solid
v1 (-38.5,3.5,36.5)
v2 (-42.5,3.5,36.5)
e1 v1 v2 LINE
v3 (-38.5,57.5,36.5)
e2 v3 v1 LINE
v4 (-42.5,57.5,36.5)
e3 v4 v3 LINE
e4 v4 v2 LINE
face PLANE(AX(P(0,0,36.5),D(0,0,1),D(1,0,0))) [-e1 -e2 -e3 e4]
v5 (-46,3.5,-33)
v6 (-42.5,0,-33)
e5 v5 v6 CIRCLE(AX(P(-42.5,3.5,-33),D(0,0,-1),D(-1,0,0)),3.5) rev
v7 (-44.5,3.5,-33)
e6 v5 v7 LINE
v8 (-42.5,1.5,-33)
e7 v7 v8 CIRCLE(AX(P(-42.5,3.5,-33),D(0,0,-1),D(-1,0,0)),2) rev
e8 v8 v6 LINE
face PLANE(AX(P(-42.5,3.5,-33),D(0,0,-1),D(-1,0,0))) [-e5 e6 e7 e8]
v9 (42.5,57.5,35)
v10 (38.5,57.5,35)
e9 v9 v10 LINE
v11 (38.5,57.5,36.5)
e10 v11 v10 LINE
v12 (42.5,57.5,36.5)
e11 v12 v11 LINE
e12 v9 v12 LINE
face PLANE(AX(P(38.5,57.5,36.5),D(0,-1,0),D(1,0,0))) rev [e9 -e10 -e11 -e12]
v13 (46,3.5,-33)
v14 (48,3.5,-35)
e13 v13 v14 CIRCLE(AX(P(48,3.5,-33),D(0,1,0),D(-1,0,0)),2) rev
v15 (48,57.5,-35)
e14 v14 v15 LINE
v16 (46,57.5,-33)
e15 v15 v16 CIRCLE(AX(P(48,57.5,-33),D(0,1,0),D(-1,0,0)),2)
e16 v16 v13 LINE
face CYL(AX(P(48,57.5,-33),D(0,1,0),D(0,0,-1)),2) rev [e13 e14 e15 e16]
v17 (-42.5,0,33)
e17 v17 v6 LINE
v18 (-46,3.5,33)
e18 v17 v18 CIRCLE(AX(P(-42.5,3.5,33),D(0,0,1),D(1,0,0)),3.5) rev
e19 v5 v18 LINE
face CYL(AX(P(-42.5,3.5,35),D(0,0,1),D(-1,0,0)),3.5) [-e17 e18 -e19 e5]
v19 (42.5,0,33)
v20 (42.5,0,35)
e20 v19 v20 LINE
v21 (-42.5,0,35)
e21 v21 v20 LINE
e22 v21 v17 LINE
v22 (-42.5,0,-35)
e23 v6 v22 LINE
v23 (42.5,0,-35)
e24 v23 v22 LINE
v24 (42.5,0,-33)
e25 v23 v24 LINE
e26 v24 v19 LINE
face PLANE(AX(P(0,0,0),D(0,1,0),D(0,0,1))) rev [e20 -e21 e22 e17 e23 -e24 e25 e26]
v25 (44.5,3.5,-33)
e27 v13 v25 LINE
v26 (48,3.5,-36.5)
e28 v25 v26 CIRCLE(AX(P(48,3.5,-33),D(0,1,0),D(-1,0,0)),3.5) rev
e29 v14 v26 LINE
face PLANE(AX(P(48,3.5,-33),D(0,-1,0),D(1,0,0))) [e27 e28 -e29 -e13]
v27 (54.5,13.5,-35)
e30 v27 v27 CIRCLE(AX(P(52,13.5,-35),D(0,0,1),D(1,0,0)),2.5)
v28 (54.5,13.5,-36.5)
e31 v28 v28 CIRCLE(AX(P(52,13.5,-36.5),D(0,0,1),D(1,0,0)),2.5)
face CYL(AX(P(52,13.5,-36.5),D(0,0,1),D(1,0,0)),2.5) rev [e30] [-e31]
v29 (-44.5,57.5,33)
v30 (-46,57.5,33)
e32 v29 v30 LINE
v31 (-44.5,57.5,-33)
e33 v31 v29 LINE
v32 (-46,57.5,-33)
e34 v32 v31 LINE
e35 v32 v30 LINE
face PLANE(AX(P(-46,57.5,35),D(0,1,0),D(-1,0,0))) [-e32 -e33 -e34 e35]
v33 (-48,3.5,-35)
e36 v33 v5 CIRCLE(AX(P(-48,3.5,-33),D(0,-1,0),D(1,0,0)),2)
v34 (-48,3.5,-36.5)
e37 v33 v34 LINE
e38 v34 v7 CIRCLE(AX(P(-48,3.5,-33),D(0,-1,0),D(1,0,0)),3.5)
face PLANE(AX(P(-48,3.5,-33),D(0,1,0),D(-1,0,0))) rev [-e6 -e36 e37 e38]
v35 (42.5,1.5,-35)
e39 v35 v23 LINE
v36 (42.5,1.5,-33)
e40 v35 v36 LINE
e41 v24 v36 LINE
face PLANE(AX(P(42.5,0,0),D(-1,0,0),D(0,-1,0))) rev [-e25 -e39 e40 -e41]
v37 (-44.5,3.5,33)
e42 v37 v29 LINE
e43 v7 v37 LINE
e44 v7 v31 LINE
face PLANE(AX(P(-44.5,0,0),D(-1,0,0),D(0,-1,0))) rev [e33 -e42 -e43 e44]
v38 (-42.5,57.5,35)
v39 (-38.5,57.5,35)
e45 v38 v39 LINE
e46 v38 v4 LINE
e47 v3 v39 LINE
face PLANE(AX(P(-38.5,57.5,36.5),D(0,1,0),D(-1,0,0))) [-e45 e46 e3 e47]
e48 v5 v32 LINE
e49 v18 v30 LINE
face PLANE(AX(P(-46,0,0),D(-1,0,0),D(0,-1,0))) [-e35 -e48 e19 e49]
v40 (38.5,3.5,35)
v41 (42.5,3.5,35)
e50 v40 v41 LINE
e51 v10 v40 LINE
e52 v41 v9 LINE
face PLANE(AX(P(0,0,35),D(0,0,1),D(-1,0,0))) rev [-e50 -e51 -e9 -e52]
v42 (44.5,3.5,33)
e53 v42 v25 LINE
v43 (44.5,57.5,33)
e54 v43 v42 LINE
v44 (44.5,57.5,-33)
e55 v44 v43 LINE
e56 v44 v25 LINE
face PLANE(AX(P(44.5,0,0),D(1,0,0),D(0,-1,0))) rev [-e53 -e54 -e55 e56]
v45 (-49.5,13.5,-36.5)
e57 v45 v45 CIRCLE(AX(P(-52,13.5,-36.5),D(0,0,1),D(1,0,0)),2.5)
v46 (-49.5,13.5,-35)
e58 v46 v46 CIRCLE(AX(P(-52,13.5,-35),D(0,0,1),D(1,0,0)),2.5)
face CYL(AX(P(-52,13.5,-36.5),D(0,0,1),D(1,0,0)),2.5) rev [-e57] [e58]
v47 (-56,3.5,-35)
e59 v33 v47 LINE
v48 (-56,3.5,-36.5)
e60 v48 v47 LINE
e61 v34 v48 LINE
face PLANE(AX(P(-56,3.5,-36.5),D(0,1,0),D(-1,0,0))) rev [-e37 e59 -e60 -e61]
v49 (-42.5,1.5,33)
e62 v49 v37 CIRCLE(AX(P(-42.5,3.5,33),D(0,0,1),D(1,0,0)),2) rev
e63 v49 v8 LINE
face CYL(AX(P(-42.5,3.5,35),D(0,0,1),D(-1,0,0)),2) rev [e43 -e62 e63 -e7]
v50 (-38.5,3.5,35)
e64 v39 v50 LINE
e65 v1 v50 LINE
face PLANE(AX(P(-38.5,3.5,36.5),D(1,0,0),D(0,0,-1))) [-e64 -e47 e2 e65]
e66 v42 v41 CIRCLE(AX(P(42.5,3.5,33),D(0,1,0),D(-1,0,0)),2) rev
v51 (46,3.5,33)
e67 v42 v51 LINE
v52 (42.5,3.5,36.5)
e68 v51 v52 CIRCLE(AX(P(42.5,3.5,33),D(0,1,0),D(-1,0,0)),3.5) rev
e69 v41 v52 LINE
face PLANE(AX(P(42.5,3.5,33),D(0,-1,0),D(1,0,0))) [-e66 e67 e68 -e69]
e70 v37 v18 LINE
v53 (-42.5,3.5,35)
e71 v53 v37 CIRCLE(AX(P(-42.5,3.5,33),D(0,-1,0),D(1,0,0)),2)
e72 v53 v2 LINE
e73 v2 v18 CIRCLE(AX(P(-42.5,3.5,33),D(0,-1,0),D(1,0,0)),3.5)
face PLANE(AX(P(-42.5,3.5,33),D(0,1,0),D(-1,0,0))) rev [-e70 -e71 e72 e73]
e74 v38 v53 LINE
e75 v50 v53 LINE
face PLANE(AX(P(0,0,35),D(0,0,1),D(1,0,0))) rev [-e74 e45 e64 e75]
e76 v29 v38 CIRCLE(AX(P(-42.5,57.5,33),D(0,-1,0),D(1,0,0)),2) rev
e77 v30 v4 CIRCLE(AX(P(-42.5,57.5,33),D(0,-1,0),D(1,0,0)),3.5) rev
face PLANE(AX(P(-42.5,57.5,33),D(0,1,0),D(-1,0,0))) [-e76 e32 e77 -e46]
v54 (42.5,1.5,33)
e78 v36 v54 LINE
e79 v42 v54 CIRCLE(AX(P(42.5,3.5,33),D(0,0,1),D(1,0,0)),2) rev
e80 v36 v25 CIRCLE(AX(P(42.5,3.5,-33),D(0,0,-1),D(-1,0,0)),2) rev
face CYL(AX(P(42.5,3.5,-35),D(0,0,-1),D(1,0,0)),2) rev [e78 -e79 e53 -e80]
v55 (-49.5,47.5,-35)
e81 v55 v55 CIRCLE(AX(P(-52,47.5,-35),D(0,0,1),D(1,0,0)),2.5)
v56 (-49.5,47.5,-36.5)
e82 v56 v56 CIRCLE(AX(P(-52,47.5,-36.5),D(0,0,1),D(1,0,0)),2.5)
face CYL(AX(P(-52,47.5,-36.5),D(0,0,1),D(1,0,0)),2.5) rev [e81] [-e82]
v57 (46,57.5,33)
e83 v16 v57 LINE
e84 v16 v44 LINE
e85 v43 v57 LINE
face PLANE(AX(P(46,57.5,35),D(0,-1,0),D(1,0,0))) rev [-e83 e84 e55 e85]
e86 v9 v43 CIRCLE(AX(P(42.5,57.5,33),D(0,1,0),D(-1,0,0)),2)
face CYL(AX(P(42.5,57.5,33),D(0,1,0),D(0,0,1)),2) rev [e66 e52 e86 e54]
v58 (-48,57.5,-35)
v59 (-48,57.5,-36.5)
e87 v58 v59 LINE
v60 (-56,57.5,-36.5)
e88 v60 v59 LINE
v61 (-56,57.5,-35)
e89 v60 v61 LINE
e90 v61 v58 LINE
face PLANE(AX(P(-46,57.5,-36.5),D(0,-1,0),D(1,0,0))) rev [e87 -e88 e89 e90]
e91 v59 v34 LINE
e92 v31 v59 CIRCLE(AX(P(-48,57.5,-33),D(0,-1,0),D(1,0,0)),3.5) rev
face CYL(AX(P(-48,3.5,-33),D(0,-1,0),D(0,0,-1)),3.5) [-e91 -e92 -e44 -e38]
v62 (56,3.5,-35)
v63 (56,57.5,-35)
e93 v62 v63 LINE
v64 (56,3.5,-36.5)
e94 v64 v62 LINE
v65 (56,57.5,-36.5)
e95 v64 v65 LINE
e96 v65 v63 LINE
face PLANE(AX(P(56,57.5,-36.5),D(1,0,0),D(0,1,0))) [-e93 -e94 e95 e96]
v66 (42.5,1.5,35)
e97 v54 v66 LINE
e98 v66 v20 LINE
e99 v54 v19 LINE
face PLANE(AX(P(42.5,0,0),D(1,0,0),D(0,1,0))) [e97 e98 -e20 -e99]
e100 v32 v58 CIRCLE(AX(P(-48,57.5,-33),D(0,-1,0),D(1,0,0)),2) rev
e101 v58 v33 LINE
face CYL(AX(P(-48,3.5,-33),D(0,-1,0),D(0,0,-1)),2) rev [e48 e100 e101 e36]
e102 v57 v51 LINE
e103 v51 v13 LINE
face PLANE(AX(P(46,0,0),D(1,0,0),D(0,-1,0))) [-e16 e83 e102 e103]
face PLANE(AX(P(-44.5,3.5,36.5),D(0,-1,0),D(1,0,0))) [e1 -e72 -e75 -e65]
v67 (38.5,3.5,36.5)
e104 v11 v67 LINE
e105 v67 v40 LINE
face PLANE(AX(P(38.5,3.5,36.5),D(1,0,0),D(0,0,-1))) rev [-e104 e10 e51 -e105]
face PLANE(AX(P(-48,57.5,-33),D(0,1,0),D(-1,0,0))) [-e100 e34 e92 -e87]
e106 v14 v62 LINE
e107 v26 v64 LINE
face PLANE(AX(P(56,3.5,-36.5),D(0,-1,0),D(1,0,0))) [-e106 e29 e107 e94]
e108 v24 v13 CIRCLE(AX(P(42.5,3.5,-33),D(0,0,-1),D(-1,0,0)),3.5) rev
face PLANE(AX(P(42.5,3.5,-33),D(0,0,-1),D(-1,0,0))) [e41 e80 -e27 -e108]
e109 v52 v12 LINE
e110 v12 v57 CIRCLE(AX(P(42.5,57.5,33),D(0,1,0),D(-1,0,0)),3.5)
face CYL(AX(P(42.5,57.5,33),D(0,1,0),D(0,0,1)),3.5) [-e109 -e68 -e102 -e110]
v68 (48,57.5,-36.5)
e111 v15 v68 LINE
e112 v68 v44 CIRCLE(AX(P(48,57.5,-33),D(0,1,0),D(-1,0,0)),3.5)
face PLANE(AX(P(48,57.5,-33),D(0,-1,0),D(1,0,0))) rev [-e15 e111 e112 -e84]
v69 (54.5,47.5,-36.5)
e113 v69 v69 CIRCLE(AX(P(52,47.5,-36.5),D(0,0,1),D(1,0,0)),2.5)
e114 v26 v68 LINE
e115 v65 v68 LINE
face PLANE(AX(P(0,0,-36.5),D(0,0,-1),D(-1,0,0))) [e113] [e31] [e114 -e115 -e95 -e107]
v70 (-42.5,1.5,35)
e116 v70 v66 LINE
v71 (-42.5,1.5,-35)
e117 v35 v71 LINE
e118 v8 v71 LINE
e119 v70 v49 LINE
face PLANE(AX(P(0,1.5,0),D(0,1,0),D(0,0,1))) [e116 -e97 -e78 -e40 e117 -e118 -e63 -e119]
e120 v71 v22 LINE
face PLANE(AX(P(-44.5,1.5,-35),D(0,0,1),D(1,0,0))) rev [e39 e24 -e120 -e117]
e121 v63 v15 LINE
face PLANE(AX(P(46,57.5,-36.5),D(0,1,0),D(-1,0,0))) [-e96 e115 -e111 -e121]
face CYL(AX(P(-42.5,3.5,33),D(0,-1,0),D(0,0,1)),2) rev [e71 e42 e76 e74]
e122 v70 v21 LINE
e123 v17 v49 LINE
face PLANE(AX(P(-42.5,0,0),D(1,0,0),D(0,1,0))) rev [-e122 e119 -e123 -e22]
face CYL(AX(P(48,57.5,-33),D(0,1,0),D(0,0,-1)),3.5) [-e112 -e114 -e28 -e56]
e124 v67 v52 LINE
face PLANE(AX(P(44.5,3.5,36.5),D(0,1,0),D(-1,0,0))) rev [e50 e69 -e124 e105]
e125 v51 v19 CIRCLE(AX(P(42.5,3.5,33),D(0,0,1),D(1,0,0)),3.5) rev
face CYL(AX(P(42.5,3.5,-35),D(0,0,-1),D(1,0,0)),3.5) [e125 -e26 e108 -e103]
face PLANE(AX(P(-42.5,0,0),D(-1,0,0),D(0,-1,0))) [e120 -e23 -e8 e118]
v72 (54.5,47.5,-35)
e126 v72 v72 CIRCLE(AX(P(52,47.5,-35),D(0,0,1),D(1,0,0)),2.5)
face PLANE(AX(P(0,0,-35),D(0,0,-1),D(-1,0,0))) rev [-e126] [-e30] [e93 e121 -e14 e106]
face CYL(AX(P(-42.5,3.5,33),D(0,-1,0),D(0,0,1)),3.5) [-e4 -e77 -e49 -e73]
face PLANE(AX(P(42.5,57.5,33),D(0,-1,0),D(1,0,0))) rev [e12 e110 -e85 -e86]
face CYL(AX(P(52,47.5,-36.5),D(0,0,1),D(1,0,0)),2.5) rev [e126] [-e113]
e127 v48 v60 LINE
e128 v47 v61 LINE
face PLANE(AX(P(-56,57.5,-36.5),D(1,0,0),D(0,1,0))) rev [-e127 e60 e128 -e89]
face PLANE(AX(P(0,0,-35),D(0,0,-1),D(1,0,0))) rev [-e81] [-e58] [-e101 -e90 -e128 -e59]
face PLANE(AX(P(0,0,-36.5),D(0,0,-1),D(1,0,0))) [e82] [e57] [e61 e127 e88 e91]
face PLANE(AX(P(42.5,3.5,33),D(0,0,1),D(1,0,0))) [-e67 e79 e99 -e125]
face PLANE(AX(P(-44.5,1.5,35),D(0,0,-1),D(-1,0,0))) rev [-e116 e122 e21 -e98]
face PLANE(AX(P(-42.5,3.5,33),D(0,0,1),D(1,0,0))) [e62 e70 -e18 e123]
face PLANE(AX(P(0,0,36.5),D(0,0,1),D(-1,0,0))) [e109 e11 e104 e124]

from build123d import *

# Parameters (mm, degrees)
SKETCH1_W                    = 89
SKETCH1_H                    = 70
BASE_FLANGE1_DEPTH           = 1.5
EDGE_FLANGE1_STRIP_W         = 10
EDGE_FLANGE1_STRIP_H         = 1.5
EDGE_FLANGE1_STRIP_CUT_DEPTH = 70
EDGE_FLANGE1_DEPTH           = 70
EDGE_FLANGE2_DEPTH           = 57.5
EDGE_FLANGE2_2_DEPTH         = 3.5
EDGE_FLANGE2_START           = 3.5
EDGE_FLANGE2_3_DEPTH         = 54
EDGE_FLANGE3_DEPTH           = 57.5
EDGE_FLANGE3_2_DEPTH         = 3.5
EDGE_FLANGE3_START           = 3.5
EDGE_FLANGE3_3_DEPTH         = 54
SKETCH16_R                   = 2.5
CUT_EXTRUDE1_DEPTH           = 10


# Read off the part's stored shape, not the designer's step: Edge-Flange2, Edge-Flange3
# Sheet-metal steps are written as plain solids
with BuildPart() as part:
    # Sketch1 → Base-Flange1 (new body)
    with BuildSketch(Plane(origin=(0, 0, 0), x_dir=(1, 0, 0), z_dir=(0, 1, 0))):
        Rectangle(SKETCH1_W, SKETCH1_H)
    extrude(amount=BASE_FLANGE1_DEPTH)

    # Edge-Flange1 strip (across the edge) → Edge-Flange1 strip cut (cut)
    with BuildSketch(Plane(origin=(-44.5, 1.5, -35), x_dir=(1, 0, 0), z_dir=(0, 0, 1))):
        with Locations((-3, -0.75)):
            Rectangle(EDGE_FLANGE1_STRIP_W, EDGE_FLANGE1_STRIP_H)
    edge_flange1_strip_cut = extrude(amount=EDGE_FLANGE1_STRIP_CUT_DEPTH, mode=Mode.SUBTRACT)

    # Edge-Flange1 section (across the edge) → Edge-Flange1 (add)
    with BuildSketch(Plane(origin=(-44.5, 1.5, -35), x_dir=(1, 0, 0), z_dir=(0, 0, 1))):
        with BuildLine():
            Line((-1.5, 2), (-1.5, 56))
            Line((-1.5, 56), (0, 56))
            Line((0, 56), (0, 2))
            ThreePointArc((0, 2), (0.585786438, 0.585786438), (2, 0))
            Line((2, 0), (2, -1.5))
            ThreePointArc((2, -1.5), (-0.474873734, -0.474873734), (-1.5, 2))
        make_face()
    edge_flange1 = extrude(amount=EDGE_FLANGE1_DEPTH)

    # Mirror1: Edge-Flange1 strip cut, Edge-Flange1 across plane
    add(edge_flange1_strip_cut.mirror(Plane(origin=(0, 0, 0), x_dir=(0, 0, 1), z_dir=(1, 0, 0))), mode=Mode.SUBTRACT)
    add(edge_flange1.mirror(Plane(origin=(0, 0, 0), x_dir=(0, 0, 1), z_dir=(1, 0, 0))))

    # Edge-Flange2 outline → Edge-Flange2 (cut)
    with BuildSketch(Plane(origin=(0, 0, 0), x_dir=(1, 0, 0), z_dir=(0, 1, 0))):
        with BuildLine():
            Line((45.127718677, 35), (42.5, 35))
            Line((42.5, 35), (42.5, 33))
            Line((42.5, 33), (44.5, 33))
            ThreePointArc((44.5, 33), (44.66061498, 34.048097173), (45.127718677, 35))
        make_face()
    edge_flange2 = extrude(amount=EDGE_FLANGE2_DEPTH, mode=Mode.SUBTRACT)

    # Edge-Flange2 2 outline → Edge-Flange2 2 (cut)
    with BuildSketch(Plane(origin=(0, 0, 0), x_dir=(1, 0, 0), z_dir=(0, 1, 0))):
        with BuildLine():
            ThreePointArc((45.127718677, 35), (44.66061498, 34.048097173), (44.5, 33))
            Line((44.5, 33), (46, 33))
            ThreePointArc((46, 33), (46.585786438, 34.414213562), (48, 35))
            Line((48, 35), (56, 35))
            Line((56, 35), (56, 36.5))
            Line((56, 36.5), (48, 36.5))
            ThreePointArc((48, 36.5), (46.379814826, 36.102418411), (45.127718677, 35))
        make_face()
    edge_flange2_2 = extrude(amount=EDGE_FLANGE2_2_DEPTH, mode=Mode.SUBTRACT)

    # Edge-Flange2 3 outline → Edge-Flange2 3 (add)
    with BuildSketch(Plane(origin=(0, 0, 0), x_dir=(1, 0, 0), z_dir=(0, 1, 0)).offset(EDGE_FLANGE2_START)):
        with BuildLine():
            ThreePointArc((45.127718677, 35), (44.66061498, 34.048097173), (44.5, 33))
            Line((44.5, 33), (46, 33))
            ThreePointArc((46, 33), (46.585786438, 34.414213562), (48, 35))
            Line((48, 35), (56, 35))
            Line((56, 35), (56, 36.5))
            Line((56, 36.5), (48, 36.5))
            ThreePointArc((48, 36.5), (46.379814826, 36.102418411), (45.127718677, 35))
        make_face()
    edge_flange2_3 = extrude(amount=EDGE_FLANGE2_3_DEPTH)

    # Mirror2: Edge-Flange2, Edge-Flange2 2, Edge-Flange2 3 across plane
    add(edge_flange2.mirror(Plane(origin=(0, 0, 0), x_dir=(0, 0, 1), z_dir=(1, 0, 0))), mode=Mode.SUBTRACT)
    add(edge_flange2_2.mirror(Plane(origin=(0, 0, 0), x_dir=(0, 0, 1), z_dir=(1, 0, 0))), mode=Mode.SUBTRACT)
    add(edge_flange2_3.mirror(Plane(origin=(0, 0, 0), x_dir=(0, 0, 1), z_dir=(1, 0, 0))))

    # Edge-Flange3 outline → Edge-Flange3 (cut)
    with BuildSketch(Plane(origin=(0, 0, 0), x_dir=(1, 0, 0), z_dir=(0, 1, 0))):
        with BuildLine():
            ThreePointArc((-44.5, -33), (-43.914213562, -34.414213562), (-42.5, -35))
            Line((-42.5, -35), (-42.5, -33))
            Line((-42.5, -33), (-44.5, -33))
        make_face()
        with BuildLine():
            ThreePointArc((-45.372281323, -35), (-45.83938502, -34.048097173), (-46, -33))
            Line((-46, -33), (-46, -35))
            Line((-46, -35), (-45.372281323, -35))
        make_face()
    edge_flange3 = extrude(amount=EDGE_FLANGE3_DEPTH, mode=Mode.SUBTRACT)

    # Edge-Flange3 2 outline → Edge-Flange3 2 (cut)
    with BuildSketch(Plane(origin=(0, 0, 0), x_dir=(1, 0, 0), z_dir=(0, 1, 0))):
        with BuildLine():
            ThreePointArc((-42.5, -35), (-43.914213562, -34.414213562), (-44.5, -33))
            Line((-44.5, -33), (-46, -33))
            ThreePointArc((-46, -33), (-45.83938502, -34.048097173), (-45.372281323, -35))
            Line((-45.372281323, -35), (-42.5, -35))
        make_face()
    edge_flange3_2 = extrude(amount=EDGE_FLANGE3_2_DEPTH, mode=Mode.SUBTRACT)

    # Edge-Flange3 3 outline → Edge-Flange3 3 (add)
    with BuildSketch(Plane(origin=(0, 0, 0), x_dir=(1, 0, 0), z_dir=(0, 1, 0)).offset(EDGE_FLANGE3_START)):
        with BuildLine():
            Line((-44.5, -33), (-44.5, -35))
            Line((-44.5, -35), (-45.372281323, -35))
            ThreePointArc((-45.372281323, -35), (-44.120185174, -36.102418411), (-42.5, -36.5))
            Line((-42.5, -36.5), (-38.5, -36.5))
            Line((-38.5, -36.5), (-38.5, -35))
            Line((-38.5, -35), (-42.5, -35))
            ThreePointArc((-42.5, -35), (-43.914213562, -34.414213562), (-44.5, -33))
        make_face()
    edge_flange3_3 = extrude(amount=EDGE_FLANGE3_3_DEPTH)

    # Mirror3: Edge-Flange3, Edge-Flange3 2, Edge-Flange3 3 across plane
    add(edge_flange3.mirror(Plane(origin=(0, 0, 0), x_dir=(0, 0, 1), z_dir=(1, 0, 0))), mode=Mode.SUBTRACT)
    add(edge_flange3_2.mirror(Plane(origin=(0, 0, 0), x_dir=(0, 0, 1), z_dir=(1, 0, 0))), mode=Mode.SUBTRACT)
    add(edge_flange3_3.mirror(Plane(origin=(0, 0, 0), x_dir=(0, 0, 1), z_dir=(1, 0, 0))))

    # Sketch16 → Cut-Extrude1 (cut)
    with BuildSketch(Plane.XY.offset(-35)):
        with Locations((52, 47.5)):
            Circle(SKETCH16_R)
        with Locations((52, 13.5)):
            Circle(SKETCH16_R)
        with Locations((-52, 47.5)):
            Circle(SKETCH16_R)
        with Locations((-52, 13.5)):
            Circle(SKETCH16_R)
    extrude(amount=-CUT_EXTRUDE1_DEPTH, mode=Mode.SUBTRACT)


solid = part.part
